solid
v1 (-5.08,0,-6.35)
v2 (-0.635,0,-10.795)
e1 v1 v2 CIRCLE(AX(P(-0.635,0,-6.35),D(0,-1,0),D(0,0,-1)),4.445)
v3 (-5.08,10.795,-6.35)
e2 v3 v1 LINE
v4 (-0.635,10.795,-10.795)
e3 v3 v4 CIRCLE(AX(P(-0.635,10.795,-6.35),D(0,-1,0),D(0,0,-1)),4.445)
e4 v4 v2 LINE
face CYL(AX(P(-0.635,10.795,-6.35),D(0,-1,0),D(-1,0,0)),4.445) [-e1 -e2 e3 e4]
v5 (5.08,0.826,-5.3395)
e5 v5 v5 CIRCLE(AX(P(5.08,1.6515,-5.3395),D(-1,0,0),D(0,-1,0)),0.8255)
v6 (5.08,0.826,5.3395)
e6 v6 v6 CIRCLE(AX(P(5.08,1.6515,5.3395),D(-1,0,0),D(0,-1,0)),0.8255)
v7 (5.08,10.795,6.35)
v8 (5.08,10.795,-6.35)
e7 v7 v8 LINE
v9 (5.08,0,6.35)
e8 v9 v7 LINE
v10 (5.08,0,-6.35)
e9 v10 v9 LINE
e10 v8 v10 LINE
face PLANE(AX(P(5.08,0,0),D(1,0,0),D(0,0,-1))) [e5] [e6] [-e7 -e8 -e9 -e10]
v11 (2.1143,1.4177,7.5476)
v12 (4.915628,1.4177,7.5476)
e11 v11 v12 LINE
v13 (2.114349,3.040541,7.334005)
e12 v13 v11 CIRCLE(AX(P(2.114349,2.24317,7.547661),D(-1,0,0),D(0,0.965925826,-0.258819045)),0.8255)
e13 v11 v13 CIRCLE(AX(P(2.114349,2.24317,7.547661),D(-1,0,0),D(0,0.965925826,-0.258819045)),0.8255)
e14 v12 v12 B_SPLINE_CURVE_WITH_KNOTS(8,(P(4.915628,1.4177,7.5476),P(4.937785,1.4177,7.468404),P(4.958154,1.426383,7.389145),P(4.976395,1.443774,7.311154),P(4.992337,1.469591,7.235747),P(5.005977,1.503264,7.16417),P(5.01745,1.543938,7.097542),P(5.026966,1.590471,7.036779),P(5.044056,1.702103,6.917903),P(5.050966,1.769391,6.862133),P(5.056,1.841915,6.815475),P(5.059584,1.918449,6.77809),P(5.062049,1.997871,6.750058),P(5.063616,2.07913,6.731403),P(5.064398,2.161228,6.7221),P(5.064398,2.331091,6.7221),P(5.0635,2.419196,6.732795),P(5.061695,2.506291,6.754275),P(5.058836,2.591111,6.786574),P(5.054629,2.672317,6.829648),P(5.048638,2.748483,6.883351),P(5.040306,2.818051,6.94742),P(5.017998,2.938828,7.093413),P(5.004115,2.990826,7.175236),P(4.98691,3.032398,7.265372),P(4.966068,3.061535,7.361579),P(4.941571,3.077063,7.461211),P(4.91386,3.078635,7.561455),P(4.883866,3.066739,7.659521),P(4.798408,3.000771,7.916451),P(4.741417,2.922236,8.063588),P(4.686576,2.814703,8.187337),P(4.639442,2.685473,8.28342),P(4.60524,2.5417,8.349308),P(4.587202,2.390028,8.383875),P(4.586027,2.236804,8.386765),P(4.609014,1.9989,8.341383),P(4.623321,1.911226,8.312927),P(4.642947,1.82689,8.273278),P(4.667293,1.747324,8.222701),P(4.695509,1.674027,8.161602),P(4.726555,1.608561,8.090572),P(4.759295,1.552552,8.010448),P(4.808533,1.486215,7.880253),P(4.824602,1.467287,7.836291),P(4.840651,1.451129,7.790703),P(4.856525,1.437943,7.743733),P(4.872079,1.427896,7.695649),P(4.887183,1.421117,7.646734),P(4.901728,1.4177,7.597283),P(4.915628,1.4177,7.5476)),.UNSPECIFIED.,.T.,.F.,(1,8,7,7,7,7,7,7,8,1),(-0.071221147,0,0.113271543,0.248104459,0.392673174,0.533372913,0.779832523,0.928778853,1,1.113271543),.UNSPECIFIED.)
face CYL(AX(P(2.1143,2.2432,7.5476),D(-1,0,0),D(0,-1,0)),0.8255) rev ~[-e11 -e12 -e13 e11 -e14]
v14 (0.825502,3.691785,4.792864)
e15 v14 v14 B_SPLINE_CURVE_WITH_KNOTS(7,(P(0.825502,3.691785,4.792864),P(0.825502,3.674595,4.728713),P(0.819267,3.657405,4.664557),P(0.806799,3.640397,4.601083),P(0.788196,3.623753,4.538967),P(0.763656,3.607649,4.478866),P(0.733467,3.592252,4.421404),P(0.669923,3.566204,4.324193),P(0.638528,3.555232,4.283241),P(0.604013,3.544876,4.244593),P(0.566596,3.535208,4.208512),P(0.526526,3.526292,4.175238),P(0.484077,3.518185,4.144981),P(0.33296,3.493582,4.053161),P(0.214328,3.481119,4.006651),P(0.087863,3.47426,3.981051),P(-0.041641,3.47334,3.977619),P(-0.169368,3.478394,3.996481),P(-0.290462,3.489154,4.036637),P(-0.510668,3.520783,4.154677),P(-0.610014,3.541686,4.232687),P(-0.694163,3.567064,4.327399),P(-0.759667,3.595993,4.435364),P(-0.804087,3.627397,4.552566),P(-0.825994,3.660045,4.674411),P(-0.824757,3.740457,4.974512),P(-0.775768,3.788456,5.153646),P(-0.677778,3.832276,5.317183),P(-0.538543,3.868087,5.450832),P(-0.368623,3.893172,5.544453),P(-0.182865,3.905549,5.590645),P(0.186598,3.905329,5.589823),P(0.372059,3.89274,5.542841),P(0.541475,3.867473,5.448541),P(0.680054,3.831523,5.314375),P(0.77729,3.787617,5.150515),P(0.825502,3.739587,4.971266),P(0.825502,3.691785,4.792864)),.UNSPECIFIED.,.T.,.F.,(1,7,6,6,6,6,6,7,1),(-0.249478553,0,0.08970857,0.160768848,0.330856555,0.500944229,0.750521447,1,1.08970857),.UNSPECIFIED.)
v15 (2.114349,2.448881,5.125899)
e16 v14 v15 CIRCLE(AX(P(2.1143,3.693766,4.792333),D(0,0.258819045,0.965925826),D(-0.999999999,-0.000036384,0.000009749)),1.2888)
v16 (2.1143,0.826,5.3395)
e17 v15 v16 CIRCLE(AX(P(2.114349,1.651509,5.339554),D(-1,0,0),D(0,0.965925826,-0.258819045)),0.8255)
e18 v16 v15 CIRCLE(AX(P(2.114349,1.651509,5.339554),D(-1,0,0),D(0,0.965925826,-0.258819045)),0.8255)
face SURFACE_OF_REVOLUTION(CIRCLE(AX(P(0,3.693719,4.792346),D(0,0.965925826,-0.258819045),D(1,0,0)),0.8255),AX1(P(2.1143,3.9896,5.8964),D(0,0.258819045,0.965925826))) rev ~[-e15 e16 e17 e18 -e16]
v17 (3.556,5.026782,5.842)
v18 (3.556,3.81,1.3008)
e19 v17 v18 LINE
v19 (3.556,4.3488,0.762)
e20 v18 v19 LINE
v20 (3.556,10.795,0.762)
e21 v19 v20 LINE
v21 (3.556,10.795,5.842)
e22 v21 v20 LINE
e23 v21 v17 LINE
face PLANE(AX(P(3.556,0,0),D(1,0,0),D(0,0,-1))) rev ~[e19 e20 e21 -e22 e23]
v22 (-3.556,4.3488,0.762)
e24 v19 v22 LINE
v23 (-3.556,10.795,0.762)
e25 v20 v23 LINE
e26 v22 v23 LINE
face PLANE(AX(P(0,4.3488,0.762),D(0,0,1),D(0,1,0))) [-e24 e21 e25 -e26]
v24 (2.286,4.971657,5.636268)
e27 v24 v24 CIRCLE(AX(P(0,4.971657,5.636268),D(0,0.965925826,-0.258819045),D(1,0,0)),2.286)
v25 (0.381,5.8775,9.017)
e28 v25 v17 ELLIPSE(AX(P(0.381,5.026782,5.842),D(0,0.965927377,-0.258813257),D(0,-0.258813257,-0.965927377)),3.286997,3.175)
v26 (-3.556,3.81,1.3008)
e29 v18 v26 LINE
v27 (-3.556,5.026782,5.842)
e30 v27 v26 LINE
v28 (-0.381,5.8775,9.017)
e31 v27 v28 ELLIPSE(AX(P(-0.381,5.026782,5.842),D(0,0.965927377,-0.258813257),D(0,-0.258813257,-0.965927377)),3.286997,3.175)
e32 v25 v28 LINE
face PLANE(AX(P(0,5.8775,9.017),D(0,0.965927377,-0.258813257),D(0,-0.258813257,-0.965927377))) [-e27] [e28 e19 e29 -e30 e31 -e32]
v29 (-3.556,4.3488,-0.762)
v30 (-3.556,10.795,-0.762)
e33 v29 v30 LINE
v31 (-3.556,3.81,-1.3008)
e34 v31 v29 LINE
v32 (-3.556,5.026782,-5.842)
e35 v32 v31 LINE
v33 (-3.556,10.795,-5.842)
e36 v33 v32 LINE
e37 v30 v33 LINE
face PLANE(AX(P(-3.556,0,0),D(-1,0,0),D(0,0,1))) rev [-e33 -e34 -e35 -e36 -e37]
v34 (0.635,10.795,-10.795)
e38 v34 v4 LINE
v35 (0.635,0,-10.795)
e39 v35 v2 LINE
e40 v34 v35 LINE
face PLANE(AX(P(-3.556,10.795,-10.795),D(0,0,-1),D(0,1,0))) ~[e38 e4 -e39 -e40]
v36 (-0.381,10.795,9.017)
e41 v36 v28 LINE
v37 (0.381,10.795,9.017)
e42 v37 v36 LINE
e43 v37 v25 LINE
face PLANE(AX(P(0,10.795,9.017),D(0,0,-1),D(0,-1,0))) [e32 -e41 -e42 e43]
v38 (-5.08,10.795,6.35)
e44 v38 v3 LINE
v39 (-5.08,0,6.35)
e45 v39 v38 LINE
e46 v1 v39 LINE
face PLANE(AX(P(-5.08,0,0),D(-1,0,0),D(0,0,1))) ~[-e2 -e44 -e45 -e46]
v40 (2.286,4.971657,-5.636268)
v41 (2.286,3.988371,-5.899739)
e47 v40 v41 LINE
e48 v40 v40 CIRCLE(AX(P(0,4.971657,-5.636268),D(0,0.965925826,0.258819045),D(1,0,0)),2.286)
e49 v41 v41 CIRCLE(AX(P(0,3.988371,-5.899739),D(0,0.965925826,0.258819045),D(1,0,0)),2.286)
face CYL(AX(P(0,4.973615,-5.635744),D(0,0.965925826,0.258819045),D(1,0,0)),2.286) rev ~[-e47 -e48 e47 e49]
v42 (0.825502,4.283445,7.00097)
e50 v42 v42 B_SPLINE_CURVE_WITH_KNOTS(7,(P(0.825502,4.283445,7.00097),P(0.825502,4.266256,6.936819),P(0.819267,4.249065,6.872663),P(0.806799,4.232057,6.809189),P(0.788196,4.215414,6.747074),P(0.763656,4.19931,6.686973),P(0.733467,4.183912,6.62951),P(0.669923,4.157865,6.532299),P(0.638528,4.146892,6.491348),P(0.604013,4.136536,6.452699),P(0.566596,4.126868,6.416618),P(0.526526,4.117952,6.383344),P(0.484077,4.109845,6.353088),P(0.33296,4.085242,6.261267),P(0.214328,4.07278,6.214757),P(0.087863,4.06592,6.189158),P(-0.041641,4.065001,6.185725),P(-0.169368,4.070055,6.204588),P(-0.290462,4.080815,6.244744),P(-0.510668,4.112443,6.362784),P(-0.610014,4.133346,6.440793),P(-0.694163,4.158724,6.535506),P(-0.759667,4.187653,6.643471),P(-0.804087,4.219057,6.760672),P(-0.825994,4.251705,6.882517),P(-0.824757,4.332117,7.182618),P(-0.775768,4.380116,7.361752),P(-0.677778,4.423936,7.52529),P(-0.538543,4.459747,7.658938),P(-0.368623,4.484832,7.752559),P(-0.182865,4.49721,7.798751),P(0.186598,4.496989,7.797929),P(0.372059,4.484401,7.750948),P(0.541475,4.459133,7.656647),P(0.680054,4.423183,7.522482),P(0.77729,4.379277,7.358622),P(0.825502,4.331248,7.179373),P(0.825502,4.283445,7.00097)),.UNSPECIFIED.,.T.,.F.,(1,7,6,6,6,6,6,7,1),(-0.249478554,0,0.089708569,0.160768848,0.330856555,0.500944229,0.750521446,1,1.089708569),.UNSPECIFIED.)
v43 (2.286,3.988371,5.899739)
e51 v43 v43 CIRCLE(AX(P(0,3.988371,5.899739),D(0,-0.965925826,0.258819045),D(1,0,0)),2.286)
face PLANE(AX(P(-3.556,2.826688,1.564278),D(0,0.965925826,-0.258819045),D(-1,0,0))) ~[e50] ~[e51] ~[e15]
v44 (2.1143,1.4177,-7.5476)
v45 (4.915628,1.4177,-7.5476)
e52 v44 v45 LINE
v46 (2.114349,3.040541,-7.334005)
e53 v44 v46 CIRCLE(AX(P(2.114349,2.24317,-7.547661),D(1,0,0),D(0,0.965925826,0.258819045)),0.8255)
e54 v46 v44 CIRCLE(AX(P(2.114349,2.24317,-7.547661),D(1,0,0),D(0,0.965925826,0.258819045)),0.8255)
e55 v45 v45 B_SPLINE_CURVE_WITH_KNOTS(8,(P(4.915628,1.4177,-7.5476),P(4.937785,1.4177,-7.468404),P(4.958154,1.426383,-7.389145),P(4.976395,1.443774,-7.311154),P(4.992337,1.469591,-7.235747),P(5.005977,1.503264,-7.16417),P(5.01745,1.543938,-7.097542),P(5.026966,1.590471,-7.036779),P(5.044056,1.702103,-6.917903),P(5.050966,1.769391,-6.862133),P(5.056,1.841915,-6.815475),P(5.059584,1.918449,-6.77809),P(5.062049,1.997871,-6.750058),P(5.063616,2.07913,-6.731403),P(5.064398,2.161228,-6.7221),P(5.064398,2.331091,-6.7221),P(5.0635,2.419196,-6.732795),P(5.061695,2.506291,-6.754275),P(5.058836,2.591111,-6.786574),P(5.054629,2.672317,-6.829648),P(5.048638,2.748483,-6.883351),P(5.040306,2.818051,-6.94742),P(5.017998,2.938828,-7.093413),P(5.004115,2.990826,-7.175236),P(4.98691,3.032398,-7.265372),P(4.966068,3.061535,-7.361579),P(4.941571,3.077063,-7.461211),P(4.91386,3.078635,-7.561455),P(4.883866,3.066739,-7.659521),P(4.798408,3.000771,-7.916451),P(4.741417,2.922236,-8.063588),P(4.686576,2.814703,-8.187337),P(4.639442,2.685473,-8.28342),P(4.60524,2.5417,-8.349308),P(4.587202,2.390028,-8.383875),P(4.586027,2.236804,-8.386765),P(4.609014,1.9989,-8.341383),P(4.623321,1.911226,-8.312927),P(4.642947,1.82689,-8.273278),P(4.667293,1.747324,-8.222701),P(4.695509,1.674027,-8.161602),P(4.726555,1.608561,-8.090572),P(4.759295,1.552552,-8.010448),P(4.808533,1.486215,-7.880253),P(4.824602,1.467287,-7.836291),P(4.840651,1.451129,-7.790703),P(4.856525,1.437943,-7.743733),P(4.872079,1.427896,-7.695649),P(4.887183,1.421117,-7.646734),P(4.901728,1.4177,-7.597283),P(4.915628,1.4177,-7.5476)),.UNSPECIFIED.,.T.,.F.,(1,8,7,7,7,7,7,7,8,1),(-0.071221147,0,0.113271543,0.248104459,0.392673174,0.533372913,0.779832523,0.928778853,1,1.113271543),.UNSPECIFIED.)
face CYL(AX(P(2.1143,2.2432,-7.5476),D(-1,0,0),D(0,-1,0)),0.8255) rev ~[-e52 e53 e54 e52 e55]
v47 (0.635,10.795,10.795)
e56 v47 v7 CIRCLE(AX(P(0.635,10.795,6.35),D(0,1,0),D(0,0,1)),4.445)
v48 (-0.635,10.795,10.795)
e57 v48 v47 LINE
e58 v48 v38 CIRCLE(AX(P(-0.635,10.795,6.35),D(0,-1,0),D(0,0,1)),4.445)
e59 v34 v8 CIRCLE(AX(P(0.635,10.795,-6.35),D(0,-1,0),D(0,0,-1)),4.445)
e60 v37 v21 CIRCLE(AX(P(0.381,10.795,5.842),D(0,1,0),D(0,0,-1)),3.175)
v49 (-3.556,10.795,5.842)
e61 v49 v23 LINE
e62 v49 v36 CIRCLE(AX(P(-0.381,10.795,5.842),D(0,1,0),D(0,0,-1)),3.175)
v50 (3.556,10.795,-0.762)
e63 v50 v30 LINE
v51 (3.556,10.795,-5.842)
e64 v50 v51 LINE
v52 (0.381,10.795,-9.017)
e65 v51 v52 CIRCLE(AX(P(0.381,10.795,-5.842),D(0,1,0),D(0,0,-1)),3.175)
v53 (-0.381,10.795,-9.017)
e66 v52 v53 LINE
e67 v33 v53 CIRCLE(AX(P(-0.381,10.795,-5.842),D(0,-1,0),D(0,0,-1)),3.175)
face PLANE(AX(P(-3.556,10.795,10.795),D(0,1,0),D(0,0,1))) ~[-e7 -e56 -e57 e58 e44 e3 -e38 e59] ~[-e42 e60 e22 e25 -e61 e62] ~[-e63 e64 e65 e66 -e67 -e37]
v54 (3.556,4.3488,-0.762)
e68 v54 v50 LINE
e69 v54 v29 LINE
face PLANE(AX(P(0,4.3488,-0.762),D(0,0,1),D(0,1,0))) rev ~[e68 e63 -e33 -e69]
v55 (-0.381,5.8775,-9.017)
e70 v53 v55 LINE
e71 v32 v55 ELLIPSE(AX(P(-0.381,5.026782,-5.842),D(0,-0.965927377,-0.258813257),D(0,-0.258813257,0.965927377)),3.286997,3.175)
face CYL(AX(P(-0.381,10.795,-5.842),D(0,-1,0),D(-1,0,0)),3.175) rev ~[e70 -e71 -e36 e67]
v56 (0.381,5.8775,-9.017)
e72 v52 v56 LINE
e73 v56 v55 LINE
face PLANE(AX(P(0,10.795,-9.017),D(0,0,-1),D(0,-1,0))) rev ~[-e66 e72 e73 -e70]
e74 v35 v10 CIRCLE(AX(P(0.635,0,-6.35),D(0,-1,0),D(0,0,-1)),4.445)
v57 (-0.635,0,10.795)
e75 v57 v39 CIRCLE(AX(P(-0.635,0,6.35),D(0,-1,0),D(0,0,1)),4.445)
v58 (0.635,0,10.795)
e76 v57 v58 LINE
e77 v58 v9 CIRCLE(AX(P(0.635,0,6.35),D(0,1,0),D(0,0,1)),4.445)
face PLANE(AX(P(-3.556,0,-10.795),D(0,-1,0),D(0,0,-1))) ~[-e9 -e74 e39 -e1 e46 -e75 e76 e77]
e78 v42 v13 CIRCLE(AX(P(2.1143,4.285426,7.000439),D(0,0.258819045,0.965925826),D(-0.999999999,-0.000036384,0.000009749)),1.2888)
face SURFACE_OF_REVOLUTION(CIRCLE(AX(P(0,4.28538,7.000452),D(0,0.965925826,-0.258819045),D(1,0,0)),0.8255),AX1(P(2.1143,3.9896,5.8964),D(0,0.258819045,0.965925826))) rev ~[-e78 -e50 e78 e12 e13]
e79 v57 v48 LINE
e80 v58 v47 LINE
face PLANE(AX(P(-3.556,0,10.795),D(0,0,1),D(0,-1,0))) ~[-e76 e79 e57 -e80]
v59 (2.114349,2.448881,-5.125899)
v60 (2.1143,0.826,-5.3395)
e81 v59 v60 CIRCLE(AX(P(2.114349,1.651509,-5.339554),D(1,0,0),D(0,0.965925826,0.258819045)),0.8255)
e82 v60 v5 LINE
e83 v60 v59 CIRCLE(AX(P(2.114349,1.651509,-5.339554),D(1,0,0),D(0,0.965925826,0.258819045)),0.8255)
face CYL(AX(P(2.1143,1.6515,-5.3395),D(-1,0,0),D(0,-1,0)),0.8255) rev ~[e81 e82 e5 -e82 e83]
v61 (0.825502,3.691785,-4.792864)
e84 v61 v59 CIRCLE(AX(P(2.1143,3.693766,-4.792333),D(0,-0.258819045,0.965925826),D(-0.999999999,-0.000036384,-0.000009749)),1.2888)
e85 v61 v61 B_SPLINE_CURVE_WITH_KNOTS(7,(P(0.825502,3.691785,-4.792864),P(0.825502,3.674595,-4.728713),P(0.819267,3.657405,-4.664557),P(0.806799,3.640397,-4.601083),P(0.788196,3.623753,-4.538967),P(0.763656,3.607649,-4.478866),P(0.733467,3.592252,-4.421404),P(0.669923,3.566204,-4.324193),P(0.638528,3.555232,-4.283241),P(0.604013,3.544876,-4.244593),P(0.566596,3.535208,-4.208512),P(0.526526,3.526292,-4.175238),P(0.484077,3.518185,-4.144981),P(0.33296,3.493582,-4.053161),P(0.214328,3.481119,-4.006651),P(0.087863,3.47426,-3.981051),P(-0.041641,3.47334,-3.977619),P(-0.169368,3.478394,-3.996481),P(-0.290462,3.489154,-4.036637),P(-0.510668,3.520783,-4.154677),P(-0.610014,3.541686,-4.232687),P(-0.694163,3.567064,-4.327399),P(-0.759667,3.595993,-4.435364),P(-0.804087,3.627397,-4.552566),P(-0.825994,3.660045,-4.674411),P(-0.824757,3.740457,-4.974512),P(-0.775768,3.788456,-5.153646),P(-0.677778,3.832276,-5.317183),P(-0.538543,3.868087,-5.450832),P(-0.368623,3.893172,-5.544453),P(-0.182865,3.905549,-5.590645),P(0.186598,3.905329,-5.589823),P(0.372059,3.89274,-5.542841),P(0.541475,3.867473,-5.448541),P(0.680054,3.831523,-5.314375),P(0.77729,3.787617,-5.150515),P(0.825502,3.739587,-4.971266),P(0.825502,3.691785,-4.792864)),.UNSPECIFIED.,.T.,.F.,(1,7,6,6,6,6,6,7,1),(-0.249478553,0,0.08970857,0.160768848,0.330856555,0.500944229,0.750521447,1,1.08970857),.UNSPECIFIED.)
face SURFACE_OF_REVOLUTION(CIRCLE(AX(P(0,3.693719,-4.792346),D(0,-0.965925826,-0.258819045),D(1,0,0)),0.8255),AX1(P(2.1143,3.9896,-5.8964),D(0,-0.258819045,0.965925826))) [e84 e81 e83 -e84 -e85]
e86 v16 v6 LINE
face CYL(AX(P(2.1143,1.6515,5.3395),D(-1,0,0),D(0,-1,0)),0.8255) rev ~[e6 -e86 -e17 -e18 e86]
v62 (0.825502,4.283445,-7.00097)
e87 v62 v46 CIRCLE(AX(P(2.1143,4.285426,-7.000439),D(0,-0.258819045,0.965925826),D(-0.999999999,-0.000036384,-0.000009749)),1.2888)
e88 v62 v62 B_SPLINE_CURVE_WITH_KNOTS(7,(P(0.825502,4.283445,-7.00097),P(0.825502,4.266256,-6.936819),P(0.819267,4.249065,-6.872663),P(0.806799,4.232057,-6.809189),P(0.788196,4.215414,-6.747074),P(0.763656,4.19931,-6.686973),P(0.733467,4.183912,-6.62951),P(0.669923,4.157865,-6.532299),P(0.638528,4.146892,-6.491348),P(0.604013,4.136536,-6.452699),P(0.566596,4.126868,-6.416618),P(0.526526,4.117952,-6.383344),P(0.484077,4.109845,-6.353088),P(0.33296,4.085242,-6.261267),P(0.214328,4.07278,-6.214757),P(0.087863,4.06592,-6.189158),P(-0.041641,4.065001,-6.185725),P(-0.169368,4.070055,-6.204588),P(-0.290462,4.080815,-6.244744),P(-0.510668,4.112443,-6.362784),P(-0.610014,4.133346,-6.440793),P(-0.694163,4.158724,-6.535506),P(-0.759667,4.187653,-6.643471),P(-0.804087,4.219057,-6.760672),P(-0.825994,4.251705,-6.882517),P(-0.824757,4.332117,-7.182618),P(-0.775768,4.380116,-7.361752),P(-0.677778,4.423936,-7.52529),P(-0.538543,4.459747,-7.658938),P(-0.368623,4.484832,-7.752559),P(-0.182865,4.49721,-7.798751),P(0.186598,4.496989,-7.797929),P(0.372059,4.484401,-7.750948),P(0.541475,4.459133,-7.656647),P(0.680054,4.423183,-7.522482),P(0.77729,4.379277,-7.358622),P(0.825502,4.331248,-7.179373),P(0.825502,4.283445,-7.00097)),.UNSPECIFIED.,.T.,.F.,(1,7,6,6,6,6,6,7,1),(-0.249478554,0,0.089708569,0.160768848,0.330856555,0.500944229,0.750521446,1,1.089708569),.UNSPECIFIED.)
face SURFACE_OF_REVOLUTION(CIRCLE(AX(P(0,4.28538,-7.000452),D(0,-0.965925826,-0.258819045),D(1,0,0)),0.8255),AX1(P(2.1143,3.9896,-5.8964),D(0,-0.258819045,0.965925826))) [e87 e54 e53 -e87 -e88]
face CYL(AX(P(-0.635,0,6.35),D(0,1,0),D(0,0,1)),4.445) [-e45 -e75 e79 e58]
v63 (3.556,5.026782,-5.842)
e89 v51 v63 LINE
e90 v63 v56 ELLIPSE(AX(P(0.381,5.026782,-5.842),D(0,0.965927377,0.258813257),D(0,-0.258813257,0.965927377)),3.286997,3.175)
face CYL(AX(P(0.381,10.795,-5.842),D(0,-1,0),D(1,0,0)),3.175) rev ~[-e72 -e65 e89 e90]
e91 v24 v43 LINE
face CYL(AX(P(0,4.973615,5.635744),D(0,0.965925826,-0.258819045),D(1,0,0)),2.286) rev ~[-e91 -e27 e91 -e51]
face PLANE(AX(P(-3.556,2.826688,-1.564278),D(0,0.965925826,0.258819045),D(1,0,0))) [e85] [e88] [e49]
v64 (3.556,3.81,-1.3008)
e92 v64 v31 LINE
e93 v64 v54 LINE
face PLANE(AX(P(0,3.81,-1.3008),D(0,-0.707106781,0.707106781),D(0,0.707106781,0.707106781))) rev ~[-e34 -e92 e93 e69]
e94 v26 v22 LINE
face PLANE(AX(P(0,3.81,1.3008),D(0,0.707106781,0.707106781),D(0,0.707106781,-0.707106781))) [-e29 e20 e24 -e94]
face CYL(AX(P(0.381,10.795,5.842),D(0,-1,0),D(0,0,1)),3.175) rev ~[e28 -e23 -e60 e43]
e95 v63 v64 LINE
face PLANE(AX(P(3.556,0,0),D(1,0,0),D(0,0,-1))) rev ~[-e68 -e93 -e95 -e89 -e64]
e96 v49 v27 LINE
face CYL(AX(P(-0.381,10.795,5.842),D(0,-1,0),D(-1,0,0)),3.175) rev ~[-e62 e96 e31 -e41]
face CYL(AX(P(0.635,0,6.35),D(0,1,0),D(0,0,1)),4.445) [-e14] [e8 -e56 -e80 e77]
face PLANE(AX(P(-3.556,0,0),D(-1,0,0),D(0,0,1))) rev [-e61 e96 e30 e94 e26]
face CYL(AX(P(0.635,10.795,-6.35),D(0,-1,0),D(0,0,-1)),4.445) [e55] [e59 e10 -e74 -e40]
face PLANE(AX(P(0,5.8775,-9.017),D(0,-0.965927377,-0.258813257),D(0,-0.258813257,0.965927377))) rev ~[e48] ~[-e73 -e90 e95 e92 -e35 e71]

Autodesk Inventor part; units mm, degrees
ref_plane "YZ Plane" through (0, 0, 0) normal (1, 0, 0) x (0, 1, 0)
ref_plane "XZ Plane" through (0, 0, 0) normal (0, 1, 0) x (-1, 0, 0)
sketch "Sketch1" plane through (0, 0, 0) normal (1, 0, 0) x (0, 1, 0)
  line L0 (0, 0) -> (0, 10.795)
  line L1 (0, 10.795) -> (10.795, 10.795)
  line L2 (10.795, 10.795) -> (10.795, 9.017)
  line L3 (10.795, 9.017) -> (5.8775, 9.017)
  line L4 (5.8775, 9.017) -> (3.81, 1.3008)
  line L5 (4.3488, 0.762) -> (10.795, 0.762)
  line L6 (10.795, 0.762) -> (10.795, 0)
  line L7 (0, 0) -> (10.795, 0) construction
  line L8 (3.81, 1.3008) -> (4.3488, 0.762)
  line L9 (0, 0) -> (0, -10.795)
  line L10 (0, -10.795) -> (10.795, -10.795)
  line L11 (10.795, -10.795) -> (10.795, -9.017)
  line L12 (10.795, -9.017) -> (5.8775, -9.017)
  line L13 (5.8775, -9.017) -> (3.81, -1.3008)
  line L14 (4.3488, -0.762) -> (10.795, -0.762)
  line L15 (10.795, -0.762) -> (10.795, 0)
  line L16 (3.81, -1.3008) -> (4.3488, -0.762)
  dimension "d0" = 10.795
  dimension "d1" = 105
  dimension "d8" = 0.762
  dimension "d33" = 3.81
  dimension "d34" = 10.795
  dimension "d35" = 0.762
  dimension "d36" = 1.778
extrude "Extrusion1" add sketch "Sketch1" along normal mid plane 7.112
sketch "Sketch2" plane through (3.556, 0, 0) normal (1, 0, 0) x (0, 0, -1)
  line L0 (-10.795, 10.795) -> (10.795, 10.795)
  line L1 (10.795, 10.795) -> (10.795, 0)
  line L2 (10.795, 0) -> (-10.795, 0)
  line L3 (-10.795, 0) -> (-10.795, 10.795)
  point P0 (0, 0)
extrude "Extrusion2" add sketch "Sketch2" along normal blind 1.524
ref_plane "Work Plane1" through (0, 0, 0) normal (-1, 0, 0) x (0, 0, 1)
mirror "Mirror1" about plane through (0, 0, 0) normal (-1, 0, 0) of "Extrusion2"
ref_plane "Work Plane2" through (3.556, 5.8775, 0) normal (0, 0, 1) x (1, 0, 0)
sketch "Sketch3" plane through (-3.556, 3.81, -1.3008) normal (0, 0.9659258, 0.258819) x (1, 0, 0)
  circle A0 centre (3.556, 4.4884) radius 2.286
  line L0 (3.556, -2.2426) -> (3.556, 4.4884) construction
  line L1 (7.112, 1.2874) -> (0, 1.2874) construction
  dimension "d14" = 4.572
  dimension "d15" = 6.731
extrude "Extrusion3" cut sketch "Sketch3" against normal blind 1.016
mirror "Mirror2" about plane through (3.556, 5.8775, 0) normal (0, 0, 1) of "Extrusion3"
fillet "Fillet4" radius 3.175 4 edges at (3.556, 8.3363, -9.017) (-3.556, 8.3363, -9.017) (3.556, 8.3363, 9.017) (-3.556, 8.3363, 9.017)
fillet "Fillet5" radius 4.445 4 edges at (5.08, 5.3975, 10.795) (5.08, 5.3975, -10.795) (-5.08, 5.3975, -10.795) (-5.08, 5.3975, 10.795)
sketch "Sketch4" plane through (0, 3.9903, 5.8992) normal (0, 0.9659258, -0.258819) x (1, 0, 0)
  line L0 (0, 0.0029) -> (0, -1.1401) construction
  line L1 (0, 0.0029) -> (0, 1.1459) construction
  line L2 (0, 0.0029) -> (0, -1.1079) construction
  circle A0 centre (0, 1.1459) radius 0.8255
  circle A1 centre (0, -1.1401) radius 0.8255
  line L3 (2.1143, 0.0029) -> (2.1143, 2.2658) construction
  point P0 (0, 6.731)
  dimension "d43" = 1.143
  dimension "d44" = 1.651
revolve "Revolution1" cut sketch "Sketch4" angle 90 about axis through (2.1143, 3.9896, 5.8964) along (0, 0.258819, 0.9659258)
mirror "Mirror3" about plane through (3.556, 5.8775, 0) normal (0, 0, 1) of "Revolution1"
sketch "Sketch6" plane through (2.1143, 4.7773, -7.6581) normal (-1, 0, 0) x (0, -1, 0)
  circle A0 centre (2.5341, 0.1105) radius 0.8255 projected
  circle A1 centre (2.5341, 0.1105) radius 0.8255
  circle A2 centre (3.1258, 2.3186) radius 0.8255 projected
  circle A3 centre (3.1258, 2.3186) radius 0.8255
  point P0 (4.7773, 7.6581)
extrude "Extrusion6" cut sketch "Sketch6" against normal up to next
mirror "Mirror10" about plane through (3.556, 5.8775, 0) normal (0, 0, 1) of "Extrusion6"
equation "\"d0\" = 0.5 * Base_Length"
equation "\"d1\" = Sensor_Angle"
equation "\"d33\" = Base_Thickness"
equation "\"d34\" = Mount_Height"
equation "\"d14\" = LED_Base"
equation "\"d15\" = Hole_to_Center"
equation "\"d18\" = Wire_Spacing"
equation "\"Wire_Spacing\" = 1.143"
equation "\"Wire_Diameter\" = 1.651"
equation "\"LED_Base\" = 4.572"
equation "\"Mount_Space\" = 16.51"
equation "\"Mount_Clearance\" = 3.175"
equation "\"Mount_Height\" = 10.795"
equation "\"Base_Length\" = 21.59"
equation "\"Base_Width\" = 10.16"
equation "\"Sensor_Angle\" = 105deg"
equation "\"Base_Thickness\" = 3.81"
equation "\"Hole_to_Center\" = 6.731"
equation "\"Tape_Width\" = 2.54"
properties part number "Line Tracker v3" material "PLA Plastic"
